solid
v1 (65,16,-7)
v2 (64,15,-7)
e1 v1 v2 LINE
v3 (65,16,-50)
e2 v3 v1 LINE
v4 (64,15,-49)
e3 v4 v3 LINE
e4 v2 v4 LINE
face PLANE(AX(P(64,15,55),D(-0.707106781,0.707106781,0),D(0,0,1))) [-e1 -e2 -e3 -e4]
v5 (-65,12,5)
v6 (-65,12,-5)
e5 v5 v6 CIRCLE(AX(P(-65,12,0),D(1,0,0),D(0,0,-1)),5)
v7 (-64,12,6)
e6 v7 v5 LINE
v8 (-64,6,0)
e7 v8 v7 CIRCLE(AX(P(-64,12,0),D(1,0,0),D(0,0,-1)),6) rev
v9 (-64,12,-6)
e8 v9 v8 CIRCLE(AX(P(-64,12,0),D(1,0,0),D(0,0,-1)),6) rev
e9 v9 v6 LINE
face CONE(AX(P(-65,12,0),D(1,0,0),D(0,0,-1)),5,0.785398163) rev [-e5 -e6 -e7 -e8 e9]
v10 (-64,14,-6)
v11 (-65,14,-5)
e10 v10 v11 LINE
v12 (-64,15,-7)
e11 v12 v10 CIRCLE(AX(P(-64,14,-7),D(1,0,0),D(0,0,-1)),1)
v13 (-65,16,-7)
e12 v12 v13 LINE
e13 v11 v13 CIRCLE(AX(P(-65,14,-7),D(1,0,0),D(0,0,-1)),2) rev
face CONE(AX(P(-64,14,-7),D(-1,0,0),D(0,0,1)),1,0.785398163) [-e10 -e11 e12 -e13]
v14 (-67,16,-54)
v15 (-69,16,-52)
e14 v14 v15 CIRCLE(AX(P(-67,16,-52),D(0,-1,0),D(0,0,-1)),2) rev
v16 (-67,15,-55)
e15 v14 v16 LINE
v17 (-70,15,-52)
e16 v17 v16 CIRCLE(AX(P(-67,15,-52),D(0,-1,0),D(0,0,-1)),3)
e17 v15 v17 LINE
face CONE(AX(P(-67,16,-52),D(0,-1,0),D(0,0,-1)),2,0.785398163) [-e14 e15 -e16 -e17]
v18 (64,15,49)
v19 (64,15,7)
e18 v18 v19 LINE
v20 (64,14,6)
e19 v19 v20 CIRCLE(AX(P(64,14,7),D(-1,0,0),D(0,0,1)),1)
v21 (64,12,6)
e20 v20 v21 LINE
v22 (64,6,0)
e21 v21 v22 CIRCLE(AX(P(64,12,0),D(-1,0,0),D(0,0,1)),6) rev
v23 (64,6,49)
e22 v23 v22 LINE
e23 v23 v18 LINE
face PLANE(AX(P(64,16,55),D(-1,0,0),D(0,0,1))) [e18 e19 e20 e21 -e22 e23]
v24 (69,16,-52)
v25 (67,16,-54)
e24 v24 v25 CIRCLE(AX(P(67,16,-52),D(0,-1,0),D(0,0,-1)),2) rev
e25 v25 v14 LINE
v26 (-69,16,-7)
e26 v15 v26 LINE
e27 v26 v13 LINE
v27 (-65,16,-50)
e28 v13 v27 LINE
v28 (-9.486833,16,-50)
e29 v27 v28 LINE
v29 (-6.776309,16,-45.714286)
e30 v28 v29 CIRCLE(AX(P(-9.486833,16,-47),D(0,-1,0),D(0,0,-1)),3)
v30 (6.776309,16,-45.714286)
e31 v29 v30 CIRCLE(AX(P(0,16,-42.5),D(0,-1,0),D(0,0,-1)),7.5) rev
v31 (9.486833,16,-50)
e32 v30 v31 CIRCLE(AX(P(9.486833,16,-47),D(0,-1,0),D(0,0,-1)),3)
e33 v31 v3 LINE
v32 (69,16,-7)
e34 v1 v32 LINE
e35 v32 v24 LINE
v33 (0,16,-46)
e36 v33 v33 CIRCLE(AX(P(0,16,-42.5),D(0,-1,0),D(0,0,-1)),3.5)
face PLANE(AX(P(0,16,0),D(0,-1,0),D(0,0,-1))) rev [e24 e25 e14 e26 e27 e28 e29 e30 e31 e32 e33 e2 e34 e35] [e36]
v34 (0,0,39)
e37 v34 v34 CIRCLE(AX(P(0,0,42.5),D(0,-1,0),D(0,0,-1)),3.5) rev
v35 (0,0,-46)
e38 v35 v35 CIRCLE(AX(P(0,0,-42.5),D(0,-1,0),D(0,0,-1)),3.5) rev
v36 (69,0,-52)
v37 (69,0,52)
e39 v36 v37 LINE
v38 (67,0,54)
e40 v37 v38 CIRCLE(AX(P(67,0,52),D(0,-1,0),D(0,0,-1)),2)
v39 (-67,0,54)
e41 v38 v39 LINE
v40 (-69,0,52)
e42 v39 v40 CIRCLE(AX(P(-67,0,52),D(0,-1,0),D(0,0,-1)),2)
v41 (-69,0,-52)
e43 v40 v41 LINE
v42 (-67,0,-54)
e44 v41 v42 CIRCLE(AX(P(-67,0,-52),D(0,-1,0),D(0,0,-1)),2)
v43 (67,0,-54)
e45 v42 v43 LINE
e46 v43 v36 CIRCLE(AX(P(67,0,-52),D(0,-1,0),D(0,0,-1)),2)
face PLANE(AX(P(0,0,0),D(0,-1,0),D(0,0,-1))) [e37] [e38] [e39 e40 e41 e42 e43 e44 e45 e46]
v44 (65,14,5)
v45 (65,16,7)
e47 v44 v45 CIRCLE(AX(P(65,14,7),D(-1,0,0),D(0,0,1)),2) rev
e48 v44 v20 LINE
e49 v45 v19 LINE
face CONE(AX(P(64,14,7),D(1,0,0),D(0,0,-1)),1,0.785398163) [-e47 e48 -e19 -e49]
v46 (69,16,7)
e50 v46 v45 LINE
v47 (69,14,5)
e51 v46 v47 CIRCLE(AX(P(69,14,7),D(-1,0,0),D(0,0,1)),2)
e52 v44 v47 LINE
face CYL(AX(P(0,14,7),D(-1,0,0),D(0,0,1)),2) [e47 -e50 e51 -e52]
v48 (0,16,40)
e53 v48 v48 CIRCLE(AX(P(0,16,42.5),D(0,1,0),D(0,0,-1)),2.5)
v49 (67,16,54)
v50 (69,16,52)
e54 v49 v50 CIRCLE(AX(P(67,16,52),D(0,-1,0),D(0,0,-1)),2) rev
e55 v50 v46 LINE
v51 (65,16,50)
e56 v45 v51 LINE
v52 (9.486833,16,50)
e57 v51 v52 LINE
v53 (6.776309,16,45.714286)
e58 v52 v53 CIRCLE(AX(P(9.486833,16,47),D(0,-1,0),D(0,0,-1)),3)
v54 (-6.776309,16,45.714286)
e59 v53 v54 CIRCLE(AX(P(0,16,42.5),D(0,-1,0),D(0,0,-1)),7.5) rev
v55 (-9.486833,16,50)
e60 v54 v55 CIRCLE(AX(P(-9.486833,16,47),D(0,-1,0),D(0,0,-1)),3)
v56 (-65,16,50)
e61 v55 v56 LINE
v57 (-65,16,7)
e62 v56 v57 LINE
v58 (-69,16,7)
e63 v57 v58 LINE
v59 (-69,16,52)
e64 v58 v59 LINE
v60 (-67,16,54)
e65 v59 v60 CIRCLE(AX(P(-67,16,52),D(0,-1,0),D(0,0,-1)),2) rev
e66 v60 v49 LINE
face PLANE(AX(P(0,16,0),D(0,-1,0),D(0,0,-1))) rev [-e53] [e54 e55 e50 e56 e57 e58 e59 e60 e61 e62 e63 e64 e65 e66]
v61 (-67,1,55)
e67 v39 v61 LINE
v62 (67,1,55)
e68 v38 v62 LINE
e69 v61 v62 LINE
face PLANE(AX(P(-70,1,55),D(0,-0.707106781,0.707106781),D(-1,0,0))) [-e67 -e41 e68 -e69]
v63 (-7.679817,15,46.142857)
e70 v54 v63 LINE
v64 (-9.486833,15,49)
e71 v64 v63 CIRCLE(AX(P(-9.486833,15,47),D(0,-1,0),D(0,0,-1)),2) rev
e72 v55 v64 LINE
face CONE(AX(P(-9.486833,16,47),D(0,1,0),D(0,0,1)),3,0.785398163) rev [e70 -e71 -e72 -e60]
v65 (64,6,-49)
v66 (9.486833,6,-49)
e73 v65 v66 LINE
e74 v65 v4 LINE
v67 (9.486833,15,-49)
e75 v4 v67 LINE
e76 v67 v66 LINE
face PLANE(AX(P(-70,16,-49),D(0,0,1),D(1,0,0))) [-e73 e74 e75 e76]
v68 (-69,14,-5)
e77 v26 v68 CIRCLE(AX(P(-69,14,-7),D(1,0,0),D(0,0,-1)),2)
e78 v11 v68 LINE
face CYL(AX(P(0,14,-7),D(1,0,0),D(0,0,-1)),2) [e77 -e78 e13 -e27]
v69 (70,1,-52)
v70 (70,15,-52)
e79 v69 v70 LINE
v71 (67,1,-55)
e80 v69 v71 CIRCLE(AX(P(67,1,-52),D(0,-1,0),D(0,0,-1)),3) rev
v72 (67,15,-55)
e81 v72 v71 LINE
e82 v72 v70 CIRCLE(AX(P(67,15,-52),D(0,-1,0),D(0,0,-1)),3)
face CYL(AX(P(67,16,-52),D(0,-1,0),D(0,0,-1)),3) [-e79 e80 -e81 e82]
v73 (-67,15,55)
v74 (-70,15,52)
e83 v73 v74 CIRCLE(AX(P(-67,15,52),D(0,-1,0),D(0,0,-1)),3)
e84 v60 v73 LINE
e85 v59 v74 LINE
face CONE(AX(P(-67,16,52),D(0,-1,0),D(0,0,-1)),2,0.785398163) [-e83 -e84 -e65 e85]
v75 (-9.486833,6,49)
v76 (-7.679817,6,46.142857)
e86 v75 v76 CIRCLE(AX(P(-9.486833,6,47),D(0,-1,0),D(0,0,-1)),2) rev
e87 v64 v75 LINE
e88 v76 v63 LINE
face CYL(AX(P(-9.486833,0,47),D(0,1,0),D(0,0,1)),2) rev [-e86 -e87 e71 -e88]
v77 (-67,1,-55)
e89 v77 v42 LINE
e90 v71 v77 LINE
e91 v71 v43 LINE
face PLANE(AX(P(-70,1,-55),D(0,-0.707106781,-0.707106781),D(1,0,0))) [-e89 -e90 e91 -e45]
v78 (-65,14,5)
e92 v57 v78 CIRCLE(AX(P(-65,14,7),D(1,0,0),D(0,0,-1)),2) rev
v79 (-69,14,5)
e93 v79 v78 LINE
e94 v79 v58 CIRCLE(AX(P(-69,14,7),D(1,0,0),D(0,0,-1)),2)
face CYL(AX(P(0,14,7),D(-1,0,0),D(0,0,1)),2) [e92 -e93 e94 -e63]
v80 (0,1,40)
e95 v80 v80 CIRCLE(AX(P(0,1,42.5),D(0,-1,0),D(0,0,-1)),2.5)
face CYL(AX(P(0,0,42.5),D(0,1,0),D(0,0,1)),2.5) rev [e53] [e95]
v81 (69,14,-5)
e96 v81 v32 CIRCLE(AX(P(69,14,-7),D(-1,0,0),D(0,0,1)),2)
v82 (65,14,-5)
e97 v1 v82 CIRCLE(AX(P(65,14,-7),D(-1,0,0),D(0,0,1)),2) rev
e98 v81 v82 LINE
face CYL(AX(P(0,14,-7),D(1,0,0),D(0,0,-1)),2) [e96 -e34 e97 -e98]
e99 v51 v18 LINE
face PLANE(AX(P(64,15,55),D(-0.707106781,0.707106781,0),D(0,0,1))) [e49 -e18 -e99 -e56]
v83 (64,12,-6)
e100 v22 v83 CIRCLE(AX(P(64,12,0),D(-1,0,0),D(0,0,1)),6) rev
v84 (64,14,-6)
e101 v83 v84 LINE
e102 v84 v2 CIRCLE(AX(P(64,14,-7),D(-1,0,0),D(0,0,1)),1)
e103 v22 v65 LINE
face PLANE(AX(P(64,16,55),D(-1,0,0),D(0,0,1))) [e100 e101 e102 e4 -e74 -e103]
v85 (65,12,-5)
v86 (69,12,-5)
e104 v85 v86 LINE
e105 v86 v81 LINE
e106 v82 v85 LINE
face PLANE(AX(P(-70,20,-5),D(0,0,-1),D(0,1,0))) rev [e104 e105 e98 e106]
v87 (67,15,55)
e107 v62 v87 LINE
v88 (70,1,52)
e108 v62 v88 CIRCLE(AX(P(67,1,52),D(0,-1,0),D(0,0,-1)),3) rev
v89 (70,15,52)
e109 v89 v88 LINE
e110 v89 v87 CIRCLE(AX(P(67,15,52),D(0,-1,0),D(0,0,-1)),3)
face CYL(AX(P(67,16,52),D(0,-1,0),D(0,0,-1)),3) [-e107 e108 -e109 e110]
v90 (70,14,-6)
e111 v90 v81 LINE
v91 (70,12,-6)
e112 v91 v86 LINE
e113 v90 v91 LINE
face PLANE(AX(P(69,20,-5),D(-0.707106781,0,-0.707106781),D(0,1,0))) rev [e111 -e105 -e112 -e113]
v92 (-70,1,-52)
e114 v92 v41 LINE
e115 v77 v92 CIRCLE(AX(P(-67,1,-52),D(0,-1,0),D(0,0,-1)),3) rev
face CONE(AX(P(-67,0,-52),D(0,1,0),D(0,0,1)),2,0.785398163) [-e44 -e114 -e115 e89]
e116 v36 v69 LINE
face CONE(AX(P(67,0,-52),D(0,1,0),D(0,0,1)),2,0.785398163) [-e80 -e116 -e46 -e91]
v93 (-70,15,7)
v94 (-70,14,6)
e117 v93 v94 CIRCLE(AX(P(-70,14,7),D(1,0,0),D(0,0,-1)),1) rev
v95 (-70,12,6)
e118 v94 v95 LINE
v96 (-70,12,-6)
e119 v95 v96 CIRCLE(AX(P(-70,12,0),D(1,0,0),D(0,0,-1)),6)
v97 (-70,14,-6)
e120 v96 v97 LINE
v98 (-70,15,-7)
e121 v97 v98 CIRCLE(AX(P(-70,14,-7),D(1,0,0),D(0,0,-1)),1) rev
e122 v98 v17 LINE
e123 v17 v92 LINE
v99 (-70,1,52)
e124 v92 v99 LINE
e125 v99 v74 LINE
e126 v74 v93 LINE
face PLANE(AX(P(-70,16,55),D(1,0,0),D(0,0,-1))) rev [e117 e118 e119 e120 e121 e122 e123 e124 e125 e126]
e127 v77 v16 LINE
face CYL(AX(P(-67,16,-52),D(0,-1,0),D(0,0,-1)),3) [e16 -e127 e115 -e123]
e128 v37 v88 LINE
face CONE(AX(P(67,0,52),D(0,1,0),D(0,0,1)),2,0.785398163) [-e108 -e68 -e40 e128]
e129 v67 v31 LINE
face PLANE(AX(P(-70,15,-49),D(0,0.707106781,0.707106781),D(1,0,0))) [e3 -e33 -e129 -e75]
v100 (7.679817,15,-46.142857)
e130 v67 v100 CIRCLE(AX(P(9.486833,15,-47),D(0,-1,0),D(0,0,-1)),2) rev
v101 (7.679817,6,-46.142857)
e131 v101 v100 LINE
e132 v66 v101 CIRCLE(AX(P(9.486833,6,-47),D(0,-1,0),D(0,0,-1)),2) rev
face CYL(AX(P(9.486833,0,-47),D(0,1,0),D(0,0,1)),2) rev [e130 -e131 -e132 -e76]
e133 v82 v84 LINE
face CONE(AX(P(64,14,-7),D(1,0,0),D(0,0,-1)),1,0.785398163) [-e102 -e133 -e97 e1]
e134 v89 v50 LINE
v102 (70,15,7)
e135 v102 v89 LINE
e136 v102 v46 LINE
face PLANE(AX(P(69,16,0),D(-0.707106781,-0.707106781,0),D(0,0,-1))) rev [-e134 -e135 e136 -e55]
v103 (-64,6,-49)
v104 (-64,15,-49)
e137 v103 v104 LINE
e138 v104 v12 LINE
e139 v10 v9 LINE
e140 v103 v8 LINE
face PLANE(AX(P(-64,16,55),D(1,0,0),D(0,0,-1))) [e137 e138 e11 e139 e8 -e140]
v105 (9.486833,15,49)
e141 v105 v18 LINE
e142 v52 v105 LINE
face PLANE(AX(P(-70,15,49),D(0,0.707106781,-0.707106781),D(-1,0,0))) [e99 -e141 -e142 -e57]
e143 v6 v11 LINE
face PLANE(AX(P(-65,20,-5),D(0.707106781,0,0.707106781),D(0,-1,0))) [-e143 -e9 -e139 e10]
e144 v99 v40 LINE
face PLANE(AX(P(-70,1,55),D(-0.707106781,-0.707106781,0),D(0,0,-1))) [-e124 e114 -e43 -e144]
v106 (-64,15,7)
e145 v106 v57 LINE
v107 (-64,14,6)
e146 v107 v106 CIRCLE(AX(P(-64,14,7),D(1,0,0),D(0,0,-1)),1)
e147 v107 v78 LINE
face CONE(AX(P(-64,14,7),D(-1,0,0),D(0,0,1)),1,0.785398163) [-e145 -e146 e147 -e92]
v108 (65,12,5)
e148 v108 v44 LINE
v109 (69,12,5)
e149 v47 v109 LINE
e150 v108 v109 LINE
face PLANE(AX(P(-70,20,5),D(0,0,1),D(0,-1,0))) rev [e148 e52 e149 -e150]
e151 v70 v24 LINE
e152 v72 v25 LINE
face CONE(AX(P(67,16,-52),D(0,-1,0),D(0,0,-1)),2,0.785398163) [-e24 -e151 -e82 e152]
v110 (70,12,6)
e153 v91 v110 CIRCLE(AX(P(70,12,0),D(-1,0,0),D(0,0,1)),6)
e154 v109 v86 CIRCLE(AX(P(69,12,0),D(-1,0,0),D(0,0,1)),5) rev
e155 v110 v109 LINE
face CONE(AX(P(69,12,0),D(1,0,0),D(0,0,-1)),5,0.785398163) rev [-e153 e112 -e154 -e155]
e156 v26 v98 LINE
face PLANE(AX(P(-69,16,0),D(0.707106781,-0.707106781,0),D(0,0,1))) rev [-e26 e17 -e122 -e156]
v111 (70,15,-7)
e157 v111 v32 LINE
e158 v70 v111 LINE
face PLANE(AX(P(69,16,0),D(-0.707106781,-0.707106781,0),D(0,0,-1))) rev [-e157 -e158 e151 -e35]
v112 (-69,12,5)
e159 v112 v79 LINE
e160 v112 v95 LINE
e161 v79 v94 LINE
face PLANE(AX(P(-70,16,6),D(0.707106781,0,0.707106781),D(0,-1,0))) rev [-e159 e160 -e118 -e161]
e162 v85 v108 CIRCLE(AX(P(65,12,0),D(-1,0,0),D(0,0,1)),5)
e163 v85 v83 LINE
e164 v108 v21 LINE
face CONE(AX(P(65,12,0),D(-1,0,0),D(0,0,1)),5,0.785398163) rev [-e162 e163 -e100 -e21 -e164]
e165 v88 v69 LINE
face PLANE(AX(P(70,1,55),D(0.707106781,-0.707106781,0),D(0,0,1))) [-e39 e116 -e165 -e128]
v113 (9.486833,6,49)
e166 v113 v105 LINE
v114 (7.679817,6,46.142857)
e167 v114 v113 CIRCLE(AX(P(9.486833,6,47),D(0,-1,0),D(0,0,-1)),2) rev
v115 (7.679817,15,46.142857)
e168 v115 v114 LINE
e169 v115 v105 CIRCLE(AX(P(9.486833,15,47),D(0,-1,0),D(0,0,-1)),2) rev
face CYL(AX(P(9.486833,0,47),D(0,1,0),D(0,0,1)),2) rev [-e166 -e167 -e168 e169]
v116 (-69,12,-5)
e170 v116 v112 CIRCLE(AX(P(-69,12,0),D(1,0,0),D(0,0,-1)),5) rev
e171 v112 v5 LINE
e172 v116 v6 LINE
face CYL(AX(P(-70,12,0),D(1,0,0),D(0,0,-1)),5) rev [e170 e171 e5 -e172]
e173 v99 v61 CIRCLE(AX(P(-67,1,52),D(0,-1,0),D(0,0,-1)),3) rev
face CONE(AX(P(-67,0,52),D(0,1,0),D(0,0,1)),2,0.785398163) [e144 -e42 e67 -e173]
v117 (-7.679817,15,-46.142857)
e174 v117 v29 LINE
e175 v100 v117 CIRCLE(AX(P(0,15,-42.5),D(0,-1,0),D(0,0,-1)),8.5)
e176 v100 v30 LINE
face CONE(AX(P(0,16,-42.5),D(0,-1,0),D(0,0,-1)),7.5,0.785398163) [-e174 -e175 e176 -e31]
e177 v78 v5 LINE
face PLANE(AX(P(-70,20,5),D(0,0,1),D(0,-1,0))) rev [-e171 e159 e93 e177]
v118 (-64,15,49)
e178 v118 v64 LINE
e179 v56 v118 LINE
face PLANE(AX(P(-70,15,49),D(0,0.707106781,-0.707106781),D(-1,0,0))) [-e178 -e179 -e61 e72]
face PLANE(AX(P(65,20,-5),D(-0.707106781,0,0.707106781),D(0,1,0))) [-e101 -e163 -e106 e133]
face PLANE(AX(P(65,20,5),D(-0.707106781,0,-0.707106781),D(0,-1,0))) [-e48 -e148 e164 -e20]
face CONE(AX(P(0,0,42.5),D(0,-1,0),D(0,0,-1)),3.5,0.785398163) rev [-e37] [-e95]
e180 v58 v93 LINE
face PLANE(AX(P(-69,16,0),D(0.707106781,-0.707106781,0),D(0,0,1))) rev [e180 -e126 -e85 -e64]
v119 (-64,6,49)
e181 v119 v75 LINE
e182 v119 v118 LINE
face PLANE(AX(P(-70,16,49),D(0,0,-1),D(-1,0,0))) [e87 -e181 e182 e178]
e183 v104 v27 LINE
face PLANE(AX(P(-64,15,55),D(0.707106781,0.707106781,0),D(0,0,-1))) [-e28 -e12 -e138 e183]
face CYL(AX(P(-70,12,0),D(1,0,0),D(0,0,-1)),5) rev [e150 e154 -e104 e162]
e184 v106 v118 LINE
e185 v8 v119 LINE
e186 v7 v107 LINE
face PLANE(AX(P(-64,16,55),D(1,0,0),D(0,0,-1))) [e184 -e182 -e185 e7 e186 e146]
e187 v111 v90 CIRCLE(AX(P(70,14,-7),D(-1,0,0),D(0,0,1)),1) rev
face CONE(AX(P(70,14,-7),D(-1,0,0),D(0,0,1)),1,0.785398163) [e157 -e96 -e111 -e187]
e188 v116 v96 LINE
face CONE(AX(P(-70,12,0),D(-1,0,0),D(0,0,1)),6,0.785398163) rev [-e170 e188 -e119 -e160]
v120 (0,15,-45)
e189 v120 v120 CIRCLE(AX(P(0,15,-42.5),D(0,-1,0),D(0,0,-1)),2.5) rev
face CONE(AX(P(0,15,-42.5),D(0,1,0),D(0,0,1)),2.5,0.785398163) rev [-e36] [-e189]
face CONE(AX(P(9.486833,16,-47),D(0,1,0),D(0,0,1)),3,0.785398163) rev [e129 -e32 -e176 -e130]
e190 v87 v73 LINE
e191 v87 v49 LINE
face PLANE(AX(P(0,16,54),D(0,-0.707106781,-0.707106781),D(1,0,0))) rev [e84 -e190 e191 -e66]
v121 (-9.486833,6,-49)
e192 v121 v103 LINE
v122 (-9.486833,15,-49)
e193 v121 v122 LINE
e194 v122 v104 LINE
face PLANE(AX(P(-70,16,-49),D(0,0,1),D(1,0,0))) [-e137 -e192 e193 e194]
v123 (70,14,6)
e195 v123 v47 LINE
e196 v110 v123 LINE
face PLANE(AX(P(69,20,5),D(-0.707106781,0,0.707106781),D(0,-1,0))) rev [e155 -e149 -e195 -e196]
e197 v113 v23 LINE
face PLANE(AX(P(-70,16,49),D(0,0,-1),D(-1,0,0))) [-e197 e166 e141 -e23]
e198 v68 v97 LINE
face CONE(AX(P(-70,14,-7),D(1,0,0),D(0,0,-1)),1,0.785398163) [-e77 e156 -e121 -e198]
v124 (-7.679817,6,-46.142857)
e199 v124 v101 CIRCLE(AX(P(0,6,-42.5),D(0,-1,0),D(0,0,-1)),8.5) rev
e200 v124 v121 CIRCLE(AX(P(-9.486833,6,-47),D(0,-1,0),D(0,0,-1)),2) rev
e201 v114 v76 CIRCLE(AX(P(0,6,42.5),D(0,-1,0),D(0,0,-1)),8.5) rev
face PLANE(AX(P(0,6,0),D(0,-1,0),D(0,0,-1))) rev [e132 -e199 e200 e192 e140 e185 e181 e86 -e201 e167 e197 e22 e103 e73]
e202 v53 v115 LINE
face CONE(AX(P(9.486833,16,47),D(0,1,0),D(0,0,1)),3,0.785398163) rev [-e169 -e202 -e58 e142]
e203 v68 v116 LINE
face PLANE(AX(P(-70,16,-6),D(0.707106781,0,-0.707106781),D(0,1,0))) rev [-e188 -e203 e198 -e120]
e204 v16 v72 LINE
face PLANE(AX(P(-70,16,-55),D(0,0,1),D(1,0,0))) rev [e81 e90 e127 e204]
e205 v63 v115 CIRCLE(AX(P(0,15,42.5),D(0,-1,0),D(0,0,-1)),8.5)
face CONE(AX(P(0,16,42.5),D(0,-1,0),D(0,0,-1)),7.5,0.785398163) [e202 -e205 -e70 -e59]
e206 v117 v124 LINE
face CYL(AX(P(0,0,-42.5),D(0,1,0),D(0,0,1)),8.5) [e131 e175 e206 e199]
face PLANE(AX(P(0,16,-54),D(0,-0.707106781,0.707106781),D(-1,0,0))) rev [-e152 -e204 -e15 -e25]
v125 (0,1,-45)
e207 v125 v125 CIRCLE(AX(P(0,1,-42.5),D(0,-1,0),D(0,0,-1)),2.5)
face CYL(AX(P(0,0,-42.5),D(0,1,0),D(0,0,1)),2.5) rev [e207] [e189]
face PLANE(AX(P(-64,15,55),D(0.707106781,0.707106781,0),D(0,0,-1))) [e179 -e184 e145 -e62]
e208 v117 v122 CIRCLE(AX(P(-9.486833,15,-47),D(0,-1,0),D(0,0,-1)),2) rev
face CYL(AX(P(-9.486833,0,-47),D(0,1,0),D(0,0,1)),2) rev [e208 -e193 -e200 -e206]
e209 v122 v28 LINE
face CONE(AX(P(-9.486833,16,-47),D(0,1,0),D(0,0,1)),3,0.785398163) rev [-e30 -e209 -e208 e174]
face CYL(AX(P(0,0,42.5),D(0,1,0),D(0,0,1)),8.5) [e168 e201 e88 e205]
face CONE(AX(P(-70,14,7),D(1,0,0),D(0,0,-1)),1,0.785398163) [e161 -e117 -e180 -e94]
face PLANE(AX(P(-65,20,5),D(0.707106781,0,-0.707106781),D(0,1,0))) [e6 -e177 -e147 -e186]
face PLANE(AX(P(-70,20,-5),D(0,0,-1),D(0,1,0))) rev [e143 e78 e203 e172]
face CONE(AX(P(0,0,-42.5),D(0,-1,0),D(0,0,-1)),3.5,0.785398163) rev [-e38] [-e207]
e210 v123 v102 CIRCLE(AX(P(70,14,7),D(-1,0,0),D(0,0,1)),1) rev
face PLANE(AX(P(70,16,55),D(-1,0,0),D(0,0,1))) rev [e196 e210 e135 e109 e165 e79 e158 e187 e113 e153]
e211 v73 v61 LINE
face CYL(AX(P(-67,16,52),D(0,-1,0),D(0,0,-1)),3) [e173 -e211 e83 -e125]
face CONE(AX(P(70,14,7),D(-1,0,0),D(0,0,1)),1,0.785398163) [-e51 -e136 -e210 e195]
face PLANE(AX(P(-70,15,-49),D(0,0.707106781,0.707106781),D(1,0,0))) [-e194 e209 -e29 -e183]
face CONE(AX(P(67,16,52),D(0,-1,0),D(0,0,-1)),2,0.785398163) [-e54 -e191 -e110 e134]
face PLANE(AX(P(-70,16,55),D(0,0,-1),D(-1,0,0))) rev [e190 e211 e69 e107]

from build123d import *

# Parameters (mm, degrees)
SKETCH1_W           = 140
SKETCH1_H           = 110
BOSS_EXTRUDE1_DEPTH = 16
SKETCH2_R           = 2.5
CUT_EXTRUDE1_DEPTH  = 91.44888059
FILLET1_R           = 3
SHELL1_T            = -6
CUT_EXTRUDE2_DEPTH  = 152.26466871
FILLET2_R           = 2
CHAMFER2_SIZE       = 1


with BuildPart() as part:
    # Sketch1 → Boss-Extrude1 (new body)
    with BuildSketch(Plane(origin=(0, 0, 0), x_dir=(1, 0, 0), z_dir=(0, 1, 0))):
        Rectangle(SKETCH1_W, SKETCH1_H)
    extrude(amount=BOSS_EXTRUDE1_DEPTH)

    # Sketch2 → Cut-Extrude1 (cut, through all)
    with BuildSketch(Plane(origin=(0, 16, 0), x_dir=(1, 0, 0), z_dir=(0, 1, 0))):
        with Locations(Location((0, 42.5, 0), (0, 0, 270))):
            Circle(SKETCH2_R)
        with Locations(Location((0, -42.5, 0), (0, 0, 90))):
            Circle(SKETCH2_R)
    extrude(amount=-CUT_EXTRUDE1_DEPTH, mode=Mode.SUBTRACT)

    # Fillet1
    fillet1_edges = [part.edges().sort_by_distance(p)[0] for p in [
        (70, 8, 55),
        (-70, 8, 55),
        (-70, 8, -55),
        (70, 8, -55),
    ]]
    fillet(fillet1_edges, radius=FILLET1_R)

    # Shell1
    shell1_openings = [part.faces().sort_by_distance(p)[0] for p in [
        (0, 16, 0),
    ]]
    offset(amount=SHELL1_T, openings=shell1_openings, kind=Kind.INTERSECTION)

    # Sketch3 → Cut-Extrude2 (cut, through all)
    with BuildSketch(Plane(origin=(70, 0, 0), x_dir=(0, 0, -1), z_dir=(1, 0, 0))):
        with BuildLine():
            Line((5, 20), (5, 12))
            ThreePointArc((5, 12), (0, 7), (-5, 12))
            Line((-5, 12), (-5, 20))
            ThreePointArc((-5, 20), (0, 25), (5, 20))
        make_face()
    extrude(amount=-CUT_EXTRUDE2_DEPTH, mode=Mode.SUBTRACT)

    # Fillet2
    fillet2_edges = [part.edges().sort_by_distance(p)[0] for p in [
        (-5.477225575, 11, -49),
        (5.477225575, 11, 49),
        (-5.477225575, 11, 49),
        (5.477225575, 11, -49),
        (67, 16, -5),
        (-67, 16, -5),
        (67, 16, 5),
        (-67, 16, 5),
    ]]
    fillet(fillet2_edges, radius=FILLET2_R)

    # Chamfer2
    chamfer2_edges = [part.edges().sort_by_distance(p)[0] for p in [
        (64, 13, -5),
        (64, 16, -28),
        (64, 15.414213562, -5.585786438),
        (64, 15.414213562, 5.585786438),
        (70, 13, 5),
        (70, 16, -29.5),
        (70, 15.414213562, -5.585786438),
        (70, 15.414213562, 5.585786438),
        (-36.74341649, 16, -49),
        (0, 16, -34),
        (-64, 13, 5),
        (-64, 15.414213562, 5.585786438),
        (-64, 15.414213562, -5.585786438),
        (-70, 13, 5),
        (-70, 15.414213562, 5.585786438),
        (-70, 15.414213562, -5.585786438),
        (-7.796524471, 16, 48.069044968),
        (7.796524471, 16, 48.069044968),
        (7.796524471, 16, -48.069044968),
        (-7.796524471, 16, -48.069044968),
        (0, 0, -45),
        (0, 16, -45),
        (0, 0, 45),
        (-70, 0, 0),
        (-70, 16, -29.5),
        (70, 0, 0),
        (0, 0, 55),
        (0, 0, -55),
        (69.121320344, 0, 54.121320344),
        (-69.121320344, 0, 54.121320344),
        (69.121320344, 0, -54.121320344),
        (-69.121320344, 0, -54.121320344),
        (0, 16, -55),
        (70, 16, 29.5),
        (0, 16, 55),
        (69.121320344, 16, 54.121320344),
        (-69.121320344, 16, 54.121320344),
        (69.121320344, 16, -54.121320344),
        (-69.121320344, 16, -54.121320344),
        (36.74341649, 16, -49),
        (-64, 16, -28),
        (-36.74341649, 16, 49),
        (64, 16, 28),
        (-64, 7, 0),
        (-64, 13, -5),
        (70, 13, -5),
        (70, 7, 0),
        (-70, 13, -5),
        (64, 7, 0),
        (-70, 7, 0),
        (64, 13, 5),
        (36.74341649, 16, 49),
        (0, 16, 34),
        (-64, 16, 28),
        (-70, 16, 29.5),
    ]]
    chamfer(chamfer2_edges, length=CHAMFER2_SIZE - 0.0001)  # a hair under: the kernel refuses the full size


solid = part.part
